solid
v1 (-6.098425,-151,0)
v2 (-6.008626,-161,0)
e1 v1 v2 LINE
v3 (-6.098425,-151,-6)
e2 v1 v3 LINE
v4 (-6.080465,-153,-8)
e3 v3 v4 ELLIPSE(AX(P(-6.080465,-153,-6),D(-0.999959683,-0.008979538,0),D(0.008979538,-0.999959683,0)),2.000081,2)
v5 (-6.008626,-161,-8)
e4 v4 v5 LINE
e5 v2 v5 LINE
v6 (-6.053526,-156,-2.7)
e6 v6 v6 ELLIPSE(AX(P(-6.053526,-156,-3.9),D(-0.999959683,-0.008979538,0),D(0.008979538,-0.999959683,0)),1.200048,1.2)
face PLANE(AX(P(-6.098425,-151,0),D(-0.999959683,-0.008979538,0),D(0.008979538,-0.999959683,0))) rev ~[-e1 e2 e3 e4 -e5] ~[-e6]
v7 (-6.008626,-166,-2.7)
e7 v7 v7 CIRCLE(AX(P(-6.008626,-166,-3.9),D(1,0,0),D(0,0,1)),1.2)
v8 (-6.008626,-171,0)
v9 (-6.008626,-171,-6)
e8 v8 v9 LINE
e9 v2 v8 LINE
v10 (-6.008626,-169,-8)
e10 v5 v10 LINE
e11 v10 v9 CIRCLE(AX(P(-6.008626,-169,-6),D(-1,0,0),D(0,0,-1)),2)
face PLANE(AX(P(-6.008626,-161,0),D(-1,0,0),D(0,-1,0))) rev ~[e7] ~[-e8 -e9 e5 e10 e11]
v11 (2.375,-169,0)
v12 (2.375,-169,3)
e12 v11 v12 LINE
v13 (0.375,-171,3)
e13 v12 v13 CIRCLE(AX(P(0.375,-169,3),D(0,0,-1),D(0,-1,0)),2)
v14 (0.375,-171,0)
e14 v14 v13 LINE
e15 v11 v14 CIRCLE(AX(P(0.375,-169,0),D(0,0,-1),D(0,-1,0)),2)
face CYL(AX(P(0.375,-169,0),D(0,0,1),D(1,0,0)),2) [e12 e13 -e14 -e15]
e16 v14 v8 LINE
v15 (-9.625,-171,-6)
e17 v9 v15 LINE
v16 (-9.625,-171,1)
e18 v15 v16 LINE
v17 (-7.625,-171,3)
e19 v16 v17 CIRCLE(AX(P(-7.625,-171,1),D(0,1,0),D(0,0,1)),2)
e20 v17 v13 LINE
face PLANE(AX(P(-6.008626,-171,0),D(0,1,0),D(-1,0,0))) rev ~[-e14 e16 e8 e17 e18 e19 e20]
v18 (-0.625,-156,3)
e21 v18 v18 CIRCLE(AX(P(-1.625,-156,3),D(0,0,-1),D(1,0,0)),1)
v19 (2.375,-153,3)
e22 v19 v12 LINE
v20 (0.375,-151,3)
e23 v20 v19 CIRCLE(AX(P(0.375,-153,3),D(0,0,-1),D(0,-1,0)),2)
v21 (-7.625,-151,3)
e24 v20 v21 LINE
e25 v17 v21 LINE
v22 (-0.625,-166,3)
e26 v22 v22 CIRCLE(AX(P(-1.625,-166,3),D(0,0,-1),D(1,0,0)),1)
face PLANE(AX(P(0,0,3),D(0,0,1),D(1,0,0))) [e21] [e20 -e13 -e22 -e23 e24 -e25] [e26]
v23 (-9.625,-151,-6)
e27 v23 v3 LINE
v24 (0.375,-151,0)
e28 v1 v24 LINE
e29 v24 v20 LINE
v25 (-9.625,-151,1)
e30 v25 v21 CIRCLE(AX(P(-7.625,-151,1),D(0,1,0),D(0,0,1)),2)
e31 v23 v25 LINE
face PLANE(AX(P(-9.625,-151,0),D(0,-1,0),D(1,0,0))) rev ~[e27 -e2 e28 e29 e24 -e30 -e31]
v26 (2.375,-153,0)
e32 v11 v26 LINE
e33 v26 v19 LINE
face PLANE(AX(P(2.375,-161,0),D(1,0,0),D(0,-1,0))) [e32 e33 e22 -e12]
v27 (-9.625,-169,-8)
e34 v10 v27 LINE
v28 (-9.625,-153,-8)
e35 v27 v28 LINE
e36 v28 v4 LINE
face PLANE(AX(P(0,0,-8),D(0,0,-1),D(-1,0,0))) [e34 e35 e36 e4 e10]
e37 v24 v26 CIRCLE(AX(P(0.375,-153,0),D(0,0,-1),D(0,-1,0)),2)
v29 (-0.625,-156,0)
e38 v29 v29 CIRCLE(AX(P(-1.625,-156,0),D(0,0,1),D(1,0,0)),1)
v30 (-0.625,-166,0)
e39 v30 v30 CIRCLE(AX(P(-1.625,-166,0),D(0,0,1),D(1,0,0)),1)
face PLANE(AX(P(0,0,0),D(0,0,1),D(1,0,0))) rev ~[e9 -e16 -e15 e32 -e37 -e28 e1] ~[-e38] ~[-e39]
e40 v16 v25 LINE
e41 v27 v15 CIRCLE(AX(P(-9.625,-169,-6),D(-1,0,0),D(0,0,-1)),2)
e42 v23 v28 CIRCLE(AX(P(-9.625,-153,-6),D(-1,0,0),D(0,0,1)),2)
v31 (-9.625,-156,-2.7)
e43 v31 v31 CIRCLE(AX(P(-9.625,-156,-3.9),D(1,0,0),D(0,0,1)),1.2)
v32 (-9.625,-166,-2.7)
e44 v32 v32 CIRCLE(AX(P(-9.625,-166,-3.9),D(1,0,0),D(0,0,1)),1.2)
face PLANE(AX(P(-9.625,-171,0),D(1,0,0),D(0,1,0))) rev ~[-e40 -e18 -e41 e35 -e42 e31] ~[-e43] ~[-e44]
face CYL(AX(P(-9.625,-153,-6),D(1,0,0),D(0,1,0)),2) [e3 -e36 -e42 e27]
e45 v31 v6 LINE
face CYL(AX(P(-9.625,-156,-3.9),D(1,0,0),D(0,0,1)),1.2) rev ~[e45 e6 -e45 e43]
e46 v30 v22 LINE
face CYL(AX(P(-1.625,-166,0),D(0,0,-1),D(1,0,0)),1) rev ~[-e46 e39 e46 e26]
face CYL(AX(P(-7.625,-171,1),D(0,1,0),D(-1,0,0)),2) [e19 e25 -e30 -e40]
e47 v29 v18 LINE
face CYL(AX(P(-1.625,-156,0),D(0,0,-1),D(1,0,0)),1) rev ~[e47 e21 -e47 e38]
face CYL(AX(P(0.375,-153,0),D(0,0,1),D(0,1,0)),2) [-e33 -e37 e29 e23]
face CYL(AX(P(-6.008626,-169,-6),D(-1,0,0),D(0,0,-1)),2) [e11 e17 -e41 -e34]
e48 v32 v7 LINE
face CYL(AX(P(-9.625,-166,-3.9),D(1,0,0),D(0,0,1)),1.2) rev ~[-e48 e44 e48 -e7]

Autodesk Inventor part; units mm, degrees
ref_plane "YZ Plane" through (0, 0, 0) normal (1, 0, 0) x (0, 1, 0)
ref_plane "XZ Plane" through (0, 0, 0) normal (0, 1, 0) x (-1, 0, 0)
ref_plane "XY Plane" through (0, 0, 0) normal (0, 0, 1) x (1, 0, 0)
ref_plane "Plano de trabajo1" through (0, 0, 0) normal (0, 0, 1) x (1, 0, 0)
sketch "Boceto1" plane through (0, 0, 0) normal (0, 0, 1) x (1, 0, 0)
  circle A0 centre (108.375, -226.9) radius 1.5
  circle A1 centre (108.375, -327.280446) radius 1.5
  line L0 (58.475, -218.4) -> (58.475, -213.4)
  line L1 (58.475, -213.4) -> (80.675, -213.4)
  line L2 (80.675, -213.4) -> (80.675, -218.4)
  line L3 (58.475, -218.4) -> (80.675, -218.4)
  line L4 (99.475, -248.4) -> (104.475, -248.4)
  line L5 (104.475, -248.4) -> (104.475, -268.4)
  line L6 (104.475, -268.4) -> (99.475, -268.4)
  line L7 (99.475, -330.5) -> (99.475, -268.4)
  line L8 (99.475, -330.5) -> (44.375, -330.5)
  line L9 (44.375, -330.5) -> (44.375, -223.4)
  line L10 (99.475, -223.4) -> (44.375, -223.4)
  line L11 (99.475, -248.4) -> (99.475, -223.4)
  line L12 (98.375, -209.4) -> (88.675, -209.4)
  line L13 (88.675, -209.4) -> (88.675, -176)
  line L14 (88.675, -176) -> (197.375, -176)
  line L15 (197.375, -176) -> (197.375, -326)
  line L16 (197.375, -326) -> (112.375, -326)
  line L17 (112.375, -326) -> (112.375, -223.4)
  arc A2 (112.375, -223.4) -> (98.375, -209.4) centre (98.375, -223.4) ccw
  line L18 (29.999359, -209.4) -> (29.999359, -326)
  line L19 (29.999359, -326) -> (20.625, -326)
  line L20 (20.625, -326) -> (20.625, -288)
  line L21 (20.625, -288) -> (9.375, -288)
  line L22 (9.375, -288) -> (9.375, -176)
  line L23 (9.375, -176) -> (20.625, -176)
  line L24 (20.625, -176) -> (20.625, -209.4)
  line L25 (20.625, -209.4) -> (29.999359, -209.4)
  circle A3 centre (69.375, -196) radius 1.6
  circle A4 centre (44.375, -196) radius 1.6
  circle A5 centre (215.275, -317.3) radius 1.5
  circle A6 centre (2.725, -309.3) radius 1.5
  circle A7 centre (2.725, -317.7) radius 1.5
  circle A8 centre (215.275, -311.6) radius 1.5
  line L26 (212.375, -161) -> (-5.625, -161)
  line L27 (-5.625, -161) -> (-5.625, -303)
  line L28 (-5.625, -303) -> (5.625, -303)
  line L29 (5.625, -303) -> (5.625, -306)
  line L30 (5.625, -306) -> (-1.875, -306)
  line L31 (-1.875, -306) -> (-1.875, -321)
  line L32 (-1.875, -321) -> (5.625, -321)
  line L33 (5.625, -321) -> (5.625, -341)
  line L34 (5.625, -341) -> (212.375, -341)
  line L35 (212.375, -341) -> (212.375, -321)
  line L36 (212.375, -321) -> (218.675, -321)
  line L37 (218.675, -321) -> (218.675, -307.9)
  line L38 (218.675, -307.9) -> (212.375, -307.9)
  line L39 (212.375, -307.9) -> (212.375, -161)
  circle A9 centre (143.025, -170) radius 1.5
  circle A10 centre (94.675, -170) radius 1.5
  circle A11 centre (191.375, -170) radius 1.5
  circle A12 centre (33.999359, -226.9) radius 1.5
  circle A13 centre (33.999359, -327.540446) radius 1.5
  circle A14 centre (143.025, -152) radius 1.5
  circle A15 centre (94.675, -152) radius 1.5
  circle A16 centre (191.375, -152) radius 1.5
  line L40 (-5.625, -161) -> (212.375, -161)
  line L41 (212.375, -161) -> (212.375, -14.1)
  line L42 (212.375, -14.1) -> (218.675, -14.1)
  line L43 (218.675, -14.1) -> (218.675, -1)
  line L44 (218.675, -1) -> (212.375, -1)
  line L45 (212.375, -1) -> (212.375, 19)
  line L46 (212.375, 19) -> (5.625, 19)
  line L47 (5.625, 19) -> (5.625, -1)
  line L48 (5.625, -1) -> (-1.875, -1)
  line L49 (-1.875, -1) -> (-1.875, -16)
  line L50 (-1.875, -16) -> (5.625, -16)
  line L51 (5.625, -16) -> (5.625, -19)
  line L52 (5.625, -19) -> (-5.625, -19)
  line L53 (-5.625, -19) -> (-5.625, -161)
  circle A17 centre (215.275, -4.7) radius 1.5
  circle A18 centre (2.725, -12.7) radius 1.5
  circle A19 centre (2.725, -4.3) radius 1.5
  circle A20 centre (215.275, -10.4) radius 1.5
  line L54 (91.875, 14.8) -> (91.875, -3.3)
  line L55 (91.875, -3.3) -> (83.875, -3.3)
  line L56 (83.875, -3.3) -> (83.875, 14.8)
  line L57 (83.875, 14.8) -> (91.875, 14.8)
  line L58 (163.175, 8.8) -> (163.175, 2.3)
  line L59 (163.175, 2.3) -> (156.675, 2.3)
  line L60 (156.675, 2.3) -> (156.675, 8.8)
  line L61 (156.675, 8.8) -> (163.175, 8.8)
  line L62 (145.075, 8.8) -> (145.075, 2.3)
  line L63 (145.075, 2.3) -> (138.575, 2.3)
  line L64 (138.575, 2.3) -> (138.575, 8.8)
  line L65 (138.575, 8.8) -> (145.075, 8.8)
  line L66 (102.375, 2.3) -> (102.375, 8.8)
  line L67 (102.375, 8.8) -> (108.875, 8.8)
  line L68 (108.875, 8.8) -> (108.875, 2.3)
  line L69 (108.875, 2.3) -> (102.375, 2.3)
  line L70 (184.675, 8.8) -> (184.675, 2.3)
  line L71 (184.675, 2.3) -> (178.175, 2.3)
  line L72 (178.175, 2.3) -> (178.175, 8.8)
  line L73 (178.175, 8.8) -> (184.675, 8.8)
  line L74 (126.975, 8.8) -> (126.975, 2.3)
  line L75 (126.975, 2.3) -> (120.475, 2.3)
  line L76 (120.475, 2.3) -> (120.475, 8.8)
  line L77 (120.475, 8.8) -> (126.975, 8.8)
  circle A21 centre (44.375, -126) radius 1.6
  circle A22 centre (69.375, -126) radius 1.6
  line L78 (20.625, -146) -> (9.375, -146)
  line L79 (9.375, -146) -> (9.375, -34)
  line L80 (9.375, -34) -> (20.625, -34)
  line L81 (20.625, -34) -> (20.625, 4)
  line L82 (20.625, 4) -> (49.475, 4)
  line L83 (49.475, 4) -> (49.475, -112.6)
  line L84 (49.475, -112.6) -> (20.625, -112.6)
  line L85 (20.625, -112.6) -> (20.625, -146)
  line L86 (88.675, -146) -> (88.675, -10.3)
  line L87 (88.675, -10.3) -> (197.375, -10.3)
  line L88 (197.375, -10.3) -> (197.375, -146)
  line L89 (197.375, -146) -> (88.675, -146)
  line L90 (220.675, 19) -> (220.675, -161)
  line L91 (-7.625, 19) -> (-7.625, -161)
  line L92 (212.875, -14.6) -> (212.875, -161)
  line L93 (-6.125, -161) -> (-6.125, -18.5)
  line L94 (-7.625, -161) -> (2.375, -161)
  line L95 (2.375, -161) -> (2.375, -171)
  line L96 (2.375, -171) -> (-9.625, -171)
  line L97 (-9.625, -171) -> (-9.625, -151)
  line L98 (-9.625, -151) -> (2.375, -151)
  line L99 (2.375, -151) -> (2.375, -171)
  line L100 (2.375, -151) -> (-1.625, -151)
  line L101 (-1.625, -151) -> (-1.625, -171)
  line L102 (2.375, -151) -> (2.375, -156)
  line L103 (2.375, -156) -> (-1.625, -156)
  line L104 (2.375, -171) -> (2.375, -166)
  line L105 (2.375, -166) -> (-1.625, -166)
  circle A23 centre (-1.625, -156) radius 1
  circle A24 centre (-1.625, -166) radius 1
  line L106 (-7.625, -161) -> (-6.125, -161)
  line L107 (-6.125, -18.5) -> (5.125, -18.5)
  line L108 (5.125, -18.5) -> (5.125, -16.5)
  line L109 (5.125, -16.5) -> (-2.375, -16.5)
  line L110 (-2.375, -16.5) -> (-2.375, -0.5)
  line L111 (-2.375, -0.5) -> (5.125, -0.5)
  line L112 (5.125, -0.5) -> (5.125, 19.5)
  line L113 (5.125, 19.5) -> (212.875, 19.5)
  line L114 (212.875, 19.5) -> (212.875, -0.5)
  line L115 (212.875, -0.5) -> (219.175, -0.5)
  line L116 (219.175, -0.5) -> (219.175, -14.6)
  line L117 (219.175, -14.6) -> (212.875, -14.6)
  line L118 (212.875, -161) -> (220.675, -161)
  arc A25 (220.675, 19) -> (218.675, 21) centre (218.675, 19) ccw
  line L119 (218.675, 21) -> (-5.625, 21)
  arc A26 (-5.625, 21) -> (-7.625, 19) centre (-5.625, 19) ccw
  circle A27 centre (216.675, -156) radius 1.5
  point P0 (0, 0)
  dimension "d0" = 10
  dimension "d1" = 10
  dimension "d2" = 12
  dimension "d3" = 20
  dimension "d4" = 4
  dimension "d5" = 5
  dimension "d6" = 5
  dimension "d7" = 2
  dimension "d8" = 2
extrude "Extrusión1" add sketch "Boceto1" along normal blind 3 contours L95 L105 A24 L101 L26 | L26 L101 A23 L103 L99 | L101 A24 L96 L27 L26 | L26 L53 L98 L101 A23 | L95 L96 L101 A24 L105 | L103 A23 L101 L98 L99 | L94 L93 L98 L53 | L27 L96 L97 L98 L91 L94 | L94 L91 L98 L93
sketch "Boceto2" plane through (0, 0, 0) normal (0, 0, -1) x (-1, 0, 0)
  line L0 (7.625, 19) -> (7.625, -161)
  line L1 (-2.375, -151) -> (9.625, -151)
  line L2 (-2.375, -171) -> (-2.375, -151)
  line L3 (9.625, -171) -> (-2.375, -171)
  line L4 (9.625, -151) -> (9.625, -171)
  circle A0 centre (1.625, -166) radius 1
  circle A1 centre (1.625, -156) radius 1
  line L5 (-14.191374, -161) -> (6.008626, -161)
  line L6 (7.625, 19) -> (7.625, -161)
  arc A2 (7.625, 19) -> (5.625, 21) centre (5.625, 19) ccw
  line L7 (5.625, 21) -> (-218.675, 21)
  arc A3 (-218.675, 21) -> (-220.675, 19) centre (-218.675, 19) ccw
  line L8 (-220.675, 19) -> (-220.675, -161)
  line L9 (-222.291374, -161) -> (-209.991374, -161)
  line L10 (-208.375, -161) -> (-208.375, 9.8)
  line L11 (-208.375, 9.8) -> (-12.575, 9.8)
  line L12 (-12.575, 9.8) -> (-12.575, -161)
  circle A4 centre (-215.275, -4.7) radius 1.2
  circle A5 centre (-2.725, -4.3) radius 1.2
  circle A6 centre (-2.725, -12.7) radius 1.2
  circle A7 centre (-215.275, -10.4) radius 1.2
  line L13 (6.008626, -161) -> (-14.191374, -161)
  line L14 (-14.191374, -161) -> (-14.191374, -337)
  line L15 (-14.191374, -337) -> (-209.991374, -337)
  line L16 (-209.991374, -337) -> (-209.991374, -161)
  line L17 (-209.991374, -161) -> (-222.291374, -161)
  line L18 (-222.291374, -161) -> (-222.291374, -346.2)
  arc A8 (-222.291374, -346.2) -> (-220.291374, -348.2) centre (-220.291374, -346.2) ccw
  line L19 (4.008626, -348.2) -> (-220.291374, -348.2)
  arc A9 (4.008626, -348.2) -> (6.008626, -346.2) centre (4.008626, -346.2) ccw
  line L20 (6.008626, -161) -> (6.008626, -346.2)
  circle A10 centre (-216.891374, -311.6) radius 1.2
  circle A11 centre (-4.341374, -309.3) radius 1.2
  circle A12 centre (-4.341374, -317.7) radius 1.2
  circle A13 centre (-216.891374, -317.3) radius 1.2
  line L21 (-2.375, -151) -> (9.625, -151)
  line L22 (9.625, -151) -> (9.625, -171)
  line L23 (9.625, -171) -> (-2.375, -171)
  line L24 (-2.375, -171) -> (-2.375, -151)
  circle A14 centre (1.625, -166) radius 1
  circle A15 centre (1.625, -156) radius 1
  point P0 (0, 0)
  point P1 (6.098425, -151)
  point P2 (7.625, -171)
  point P3 (6.008626, -171)
sketch "Boceto2 outline for Extrusión2" plane through (0, 0, 0) normal (0, 0, -1) x (-1, 0, 0)
  line L0 (6.008626, -161) -> (6.008626, -171)
  line L1 (6.098425, -151) -> (6.008626, -161)
  line L2 (9.625, -151) -> (6.098425, -151)
  line L3 (9.625, -171) -> (9.625, -151)
  line L4 (6.008626, -171) -> (9.625, -171)
extrude "Extrusión2" add sketch "Boceto2 outline for Extrusión2" along normal blind 8
fillet "Empalme1" radius 2 1 edges at (-9.625, -161, 3)
sketch "Boceto4" plane through (-9.625, -171, -8) normal (-1, 0, 0) x (0, 0, 1)
  line L0 (9, 20) -> (9, 0) projected
  line L1 (0, 20) -> (9, 20) projected
  line L2 (0, 0) -> (0, 20) projected
  line L3 (0, 0) -> (9, 0) projected
  line L4 (4.1, 262) -> (4.1, -242)
  line L5 (4.1, 20) -> (4.1, 15)
  circle A0 centre (4.1, 15) radius 1
  line L6 (8, 0) -> (0, 0) projected
  line L7 (4.1, 0) -> (4.1, 5)
  circle A1 centre (4.1, 5) radius 1
  point P0 (8, 171)
  dimension "d14" = 5
  dimension "d15" = 2
  dimension "d16" = 5
  dimension "d17" = 2
hole "Agujero1" at (-9.625, -166, -3.9) at (-9.625, -156, -3.9) direction (1, 0, 0) diameter 2.4 end through all
fillet "Empalme2" radius 2 4 edges at (-7.8617, -151, -8) (-7.8168, -171, -8) (2.375, -151, 1.5) (2.375, -171, 1.5)
properties part number "Union abajo"
